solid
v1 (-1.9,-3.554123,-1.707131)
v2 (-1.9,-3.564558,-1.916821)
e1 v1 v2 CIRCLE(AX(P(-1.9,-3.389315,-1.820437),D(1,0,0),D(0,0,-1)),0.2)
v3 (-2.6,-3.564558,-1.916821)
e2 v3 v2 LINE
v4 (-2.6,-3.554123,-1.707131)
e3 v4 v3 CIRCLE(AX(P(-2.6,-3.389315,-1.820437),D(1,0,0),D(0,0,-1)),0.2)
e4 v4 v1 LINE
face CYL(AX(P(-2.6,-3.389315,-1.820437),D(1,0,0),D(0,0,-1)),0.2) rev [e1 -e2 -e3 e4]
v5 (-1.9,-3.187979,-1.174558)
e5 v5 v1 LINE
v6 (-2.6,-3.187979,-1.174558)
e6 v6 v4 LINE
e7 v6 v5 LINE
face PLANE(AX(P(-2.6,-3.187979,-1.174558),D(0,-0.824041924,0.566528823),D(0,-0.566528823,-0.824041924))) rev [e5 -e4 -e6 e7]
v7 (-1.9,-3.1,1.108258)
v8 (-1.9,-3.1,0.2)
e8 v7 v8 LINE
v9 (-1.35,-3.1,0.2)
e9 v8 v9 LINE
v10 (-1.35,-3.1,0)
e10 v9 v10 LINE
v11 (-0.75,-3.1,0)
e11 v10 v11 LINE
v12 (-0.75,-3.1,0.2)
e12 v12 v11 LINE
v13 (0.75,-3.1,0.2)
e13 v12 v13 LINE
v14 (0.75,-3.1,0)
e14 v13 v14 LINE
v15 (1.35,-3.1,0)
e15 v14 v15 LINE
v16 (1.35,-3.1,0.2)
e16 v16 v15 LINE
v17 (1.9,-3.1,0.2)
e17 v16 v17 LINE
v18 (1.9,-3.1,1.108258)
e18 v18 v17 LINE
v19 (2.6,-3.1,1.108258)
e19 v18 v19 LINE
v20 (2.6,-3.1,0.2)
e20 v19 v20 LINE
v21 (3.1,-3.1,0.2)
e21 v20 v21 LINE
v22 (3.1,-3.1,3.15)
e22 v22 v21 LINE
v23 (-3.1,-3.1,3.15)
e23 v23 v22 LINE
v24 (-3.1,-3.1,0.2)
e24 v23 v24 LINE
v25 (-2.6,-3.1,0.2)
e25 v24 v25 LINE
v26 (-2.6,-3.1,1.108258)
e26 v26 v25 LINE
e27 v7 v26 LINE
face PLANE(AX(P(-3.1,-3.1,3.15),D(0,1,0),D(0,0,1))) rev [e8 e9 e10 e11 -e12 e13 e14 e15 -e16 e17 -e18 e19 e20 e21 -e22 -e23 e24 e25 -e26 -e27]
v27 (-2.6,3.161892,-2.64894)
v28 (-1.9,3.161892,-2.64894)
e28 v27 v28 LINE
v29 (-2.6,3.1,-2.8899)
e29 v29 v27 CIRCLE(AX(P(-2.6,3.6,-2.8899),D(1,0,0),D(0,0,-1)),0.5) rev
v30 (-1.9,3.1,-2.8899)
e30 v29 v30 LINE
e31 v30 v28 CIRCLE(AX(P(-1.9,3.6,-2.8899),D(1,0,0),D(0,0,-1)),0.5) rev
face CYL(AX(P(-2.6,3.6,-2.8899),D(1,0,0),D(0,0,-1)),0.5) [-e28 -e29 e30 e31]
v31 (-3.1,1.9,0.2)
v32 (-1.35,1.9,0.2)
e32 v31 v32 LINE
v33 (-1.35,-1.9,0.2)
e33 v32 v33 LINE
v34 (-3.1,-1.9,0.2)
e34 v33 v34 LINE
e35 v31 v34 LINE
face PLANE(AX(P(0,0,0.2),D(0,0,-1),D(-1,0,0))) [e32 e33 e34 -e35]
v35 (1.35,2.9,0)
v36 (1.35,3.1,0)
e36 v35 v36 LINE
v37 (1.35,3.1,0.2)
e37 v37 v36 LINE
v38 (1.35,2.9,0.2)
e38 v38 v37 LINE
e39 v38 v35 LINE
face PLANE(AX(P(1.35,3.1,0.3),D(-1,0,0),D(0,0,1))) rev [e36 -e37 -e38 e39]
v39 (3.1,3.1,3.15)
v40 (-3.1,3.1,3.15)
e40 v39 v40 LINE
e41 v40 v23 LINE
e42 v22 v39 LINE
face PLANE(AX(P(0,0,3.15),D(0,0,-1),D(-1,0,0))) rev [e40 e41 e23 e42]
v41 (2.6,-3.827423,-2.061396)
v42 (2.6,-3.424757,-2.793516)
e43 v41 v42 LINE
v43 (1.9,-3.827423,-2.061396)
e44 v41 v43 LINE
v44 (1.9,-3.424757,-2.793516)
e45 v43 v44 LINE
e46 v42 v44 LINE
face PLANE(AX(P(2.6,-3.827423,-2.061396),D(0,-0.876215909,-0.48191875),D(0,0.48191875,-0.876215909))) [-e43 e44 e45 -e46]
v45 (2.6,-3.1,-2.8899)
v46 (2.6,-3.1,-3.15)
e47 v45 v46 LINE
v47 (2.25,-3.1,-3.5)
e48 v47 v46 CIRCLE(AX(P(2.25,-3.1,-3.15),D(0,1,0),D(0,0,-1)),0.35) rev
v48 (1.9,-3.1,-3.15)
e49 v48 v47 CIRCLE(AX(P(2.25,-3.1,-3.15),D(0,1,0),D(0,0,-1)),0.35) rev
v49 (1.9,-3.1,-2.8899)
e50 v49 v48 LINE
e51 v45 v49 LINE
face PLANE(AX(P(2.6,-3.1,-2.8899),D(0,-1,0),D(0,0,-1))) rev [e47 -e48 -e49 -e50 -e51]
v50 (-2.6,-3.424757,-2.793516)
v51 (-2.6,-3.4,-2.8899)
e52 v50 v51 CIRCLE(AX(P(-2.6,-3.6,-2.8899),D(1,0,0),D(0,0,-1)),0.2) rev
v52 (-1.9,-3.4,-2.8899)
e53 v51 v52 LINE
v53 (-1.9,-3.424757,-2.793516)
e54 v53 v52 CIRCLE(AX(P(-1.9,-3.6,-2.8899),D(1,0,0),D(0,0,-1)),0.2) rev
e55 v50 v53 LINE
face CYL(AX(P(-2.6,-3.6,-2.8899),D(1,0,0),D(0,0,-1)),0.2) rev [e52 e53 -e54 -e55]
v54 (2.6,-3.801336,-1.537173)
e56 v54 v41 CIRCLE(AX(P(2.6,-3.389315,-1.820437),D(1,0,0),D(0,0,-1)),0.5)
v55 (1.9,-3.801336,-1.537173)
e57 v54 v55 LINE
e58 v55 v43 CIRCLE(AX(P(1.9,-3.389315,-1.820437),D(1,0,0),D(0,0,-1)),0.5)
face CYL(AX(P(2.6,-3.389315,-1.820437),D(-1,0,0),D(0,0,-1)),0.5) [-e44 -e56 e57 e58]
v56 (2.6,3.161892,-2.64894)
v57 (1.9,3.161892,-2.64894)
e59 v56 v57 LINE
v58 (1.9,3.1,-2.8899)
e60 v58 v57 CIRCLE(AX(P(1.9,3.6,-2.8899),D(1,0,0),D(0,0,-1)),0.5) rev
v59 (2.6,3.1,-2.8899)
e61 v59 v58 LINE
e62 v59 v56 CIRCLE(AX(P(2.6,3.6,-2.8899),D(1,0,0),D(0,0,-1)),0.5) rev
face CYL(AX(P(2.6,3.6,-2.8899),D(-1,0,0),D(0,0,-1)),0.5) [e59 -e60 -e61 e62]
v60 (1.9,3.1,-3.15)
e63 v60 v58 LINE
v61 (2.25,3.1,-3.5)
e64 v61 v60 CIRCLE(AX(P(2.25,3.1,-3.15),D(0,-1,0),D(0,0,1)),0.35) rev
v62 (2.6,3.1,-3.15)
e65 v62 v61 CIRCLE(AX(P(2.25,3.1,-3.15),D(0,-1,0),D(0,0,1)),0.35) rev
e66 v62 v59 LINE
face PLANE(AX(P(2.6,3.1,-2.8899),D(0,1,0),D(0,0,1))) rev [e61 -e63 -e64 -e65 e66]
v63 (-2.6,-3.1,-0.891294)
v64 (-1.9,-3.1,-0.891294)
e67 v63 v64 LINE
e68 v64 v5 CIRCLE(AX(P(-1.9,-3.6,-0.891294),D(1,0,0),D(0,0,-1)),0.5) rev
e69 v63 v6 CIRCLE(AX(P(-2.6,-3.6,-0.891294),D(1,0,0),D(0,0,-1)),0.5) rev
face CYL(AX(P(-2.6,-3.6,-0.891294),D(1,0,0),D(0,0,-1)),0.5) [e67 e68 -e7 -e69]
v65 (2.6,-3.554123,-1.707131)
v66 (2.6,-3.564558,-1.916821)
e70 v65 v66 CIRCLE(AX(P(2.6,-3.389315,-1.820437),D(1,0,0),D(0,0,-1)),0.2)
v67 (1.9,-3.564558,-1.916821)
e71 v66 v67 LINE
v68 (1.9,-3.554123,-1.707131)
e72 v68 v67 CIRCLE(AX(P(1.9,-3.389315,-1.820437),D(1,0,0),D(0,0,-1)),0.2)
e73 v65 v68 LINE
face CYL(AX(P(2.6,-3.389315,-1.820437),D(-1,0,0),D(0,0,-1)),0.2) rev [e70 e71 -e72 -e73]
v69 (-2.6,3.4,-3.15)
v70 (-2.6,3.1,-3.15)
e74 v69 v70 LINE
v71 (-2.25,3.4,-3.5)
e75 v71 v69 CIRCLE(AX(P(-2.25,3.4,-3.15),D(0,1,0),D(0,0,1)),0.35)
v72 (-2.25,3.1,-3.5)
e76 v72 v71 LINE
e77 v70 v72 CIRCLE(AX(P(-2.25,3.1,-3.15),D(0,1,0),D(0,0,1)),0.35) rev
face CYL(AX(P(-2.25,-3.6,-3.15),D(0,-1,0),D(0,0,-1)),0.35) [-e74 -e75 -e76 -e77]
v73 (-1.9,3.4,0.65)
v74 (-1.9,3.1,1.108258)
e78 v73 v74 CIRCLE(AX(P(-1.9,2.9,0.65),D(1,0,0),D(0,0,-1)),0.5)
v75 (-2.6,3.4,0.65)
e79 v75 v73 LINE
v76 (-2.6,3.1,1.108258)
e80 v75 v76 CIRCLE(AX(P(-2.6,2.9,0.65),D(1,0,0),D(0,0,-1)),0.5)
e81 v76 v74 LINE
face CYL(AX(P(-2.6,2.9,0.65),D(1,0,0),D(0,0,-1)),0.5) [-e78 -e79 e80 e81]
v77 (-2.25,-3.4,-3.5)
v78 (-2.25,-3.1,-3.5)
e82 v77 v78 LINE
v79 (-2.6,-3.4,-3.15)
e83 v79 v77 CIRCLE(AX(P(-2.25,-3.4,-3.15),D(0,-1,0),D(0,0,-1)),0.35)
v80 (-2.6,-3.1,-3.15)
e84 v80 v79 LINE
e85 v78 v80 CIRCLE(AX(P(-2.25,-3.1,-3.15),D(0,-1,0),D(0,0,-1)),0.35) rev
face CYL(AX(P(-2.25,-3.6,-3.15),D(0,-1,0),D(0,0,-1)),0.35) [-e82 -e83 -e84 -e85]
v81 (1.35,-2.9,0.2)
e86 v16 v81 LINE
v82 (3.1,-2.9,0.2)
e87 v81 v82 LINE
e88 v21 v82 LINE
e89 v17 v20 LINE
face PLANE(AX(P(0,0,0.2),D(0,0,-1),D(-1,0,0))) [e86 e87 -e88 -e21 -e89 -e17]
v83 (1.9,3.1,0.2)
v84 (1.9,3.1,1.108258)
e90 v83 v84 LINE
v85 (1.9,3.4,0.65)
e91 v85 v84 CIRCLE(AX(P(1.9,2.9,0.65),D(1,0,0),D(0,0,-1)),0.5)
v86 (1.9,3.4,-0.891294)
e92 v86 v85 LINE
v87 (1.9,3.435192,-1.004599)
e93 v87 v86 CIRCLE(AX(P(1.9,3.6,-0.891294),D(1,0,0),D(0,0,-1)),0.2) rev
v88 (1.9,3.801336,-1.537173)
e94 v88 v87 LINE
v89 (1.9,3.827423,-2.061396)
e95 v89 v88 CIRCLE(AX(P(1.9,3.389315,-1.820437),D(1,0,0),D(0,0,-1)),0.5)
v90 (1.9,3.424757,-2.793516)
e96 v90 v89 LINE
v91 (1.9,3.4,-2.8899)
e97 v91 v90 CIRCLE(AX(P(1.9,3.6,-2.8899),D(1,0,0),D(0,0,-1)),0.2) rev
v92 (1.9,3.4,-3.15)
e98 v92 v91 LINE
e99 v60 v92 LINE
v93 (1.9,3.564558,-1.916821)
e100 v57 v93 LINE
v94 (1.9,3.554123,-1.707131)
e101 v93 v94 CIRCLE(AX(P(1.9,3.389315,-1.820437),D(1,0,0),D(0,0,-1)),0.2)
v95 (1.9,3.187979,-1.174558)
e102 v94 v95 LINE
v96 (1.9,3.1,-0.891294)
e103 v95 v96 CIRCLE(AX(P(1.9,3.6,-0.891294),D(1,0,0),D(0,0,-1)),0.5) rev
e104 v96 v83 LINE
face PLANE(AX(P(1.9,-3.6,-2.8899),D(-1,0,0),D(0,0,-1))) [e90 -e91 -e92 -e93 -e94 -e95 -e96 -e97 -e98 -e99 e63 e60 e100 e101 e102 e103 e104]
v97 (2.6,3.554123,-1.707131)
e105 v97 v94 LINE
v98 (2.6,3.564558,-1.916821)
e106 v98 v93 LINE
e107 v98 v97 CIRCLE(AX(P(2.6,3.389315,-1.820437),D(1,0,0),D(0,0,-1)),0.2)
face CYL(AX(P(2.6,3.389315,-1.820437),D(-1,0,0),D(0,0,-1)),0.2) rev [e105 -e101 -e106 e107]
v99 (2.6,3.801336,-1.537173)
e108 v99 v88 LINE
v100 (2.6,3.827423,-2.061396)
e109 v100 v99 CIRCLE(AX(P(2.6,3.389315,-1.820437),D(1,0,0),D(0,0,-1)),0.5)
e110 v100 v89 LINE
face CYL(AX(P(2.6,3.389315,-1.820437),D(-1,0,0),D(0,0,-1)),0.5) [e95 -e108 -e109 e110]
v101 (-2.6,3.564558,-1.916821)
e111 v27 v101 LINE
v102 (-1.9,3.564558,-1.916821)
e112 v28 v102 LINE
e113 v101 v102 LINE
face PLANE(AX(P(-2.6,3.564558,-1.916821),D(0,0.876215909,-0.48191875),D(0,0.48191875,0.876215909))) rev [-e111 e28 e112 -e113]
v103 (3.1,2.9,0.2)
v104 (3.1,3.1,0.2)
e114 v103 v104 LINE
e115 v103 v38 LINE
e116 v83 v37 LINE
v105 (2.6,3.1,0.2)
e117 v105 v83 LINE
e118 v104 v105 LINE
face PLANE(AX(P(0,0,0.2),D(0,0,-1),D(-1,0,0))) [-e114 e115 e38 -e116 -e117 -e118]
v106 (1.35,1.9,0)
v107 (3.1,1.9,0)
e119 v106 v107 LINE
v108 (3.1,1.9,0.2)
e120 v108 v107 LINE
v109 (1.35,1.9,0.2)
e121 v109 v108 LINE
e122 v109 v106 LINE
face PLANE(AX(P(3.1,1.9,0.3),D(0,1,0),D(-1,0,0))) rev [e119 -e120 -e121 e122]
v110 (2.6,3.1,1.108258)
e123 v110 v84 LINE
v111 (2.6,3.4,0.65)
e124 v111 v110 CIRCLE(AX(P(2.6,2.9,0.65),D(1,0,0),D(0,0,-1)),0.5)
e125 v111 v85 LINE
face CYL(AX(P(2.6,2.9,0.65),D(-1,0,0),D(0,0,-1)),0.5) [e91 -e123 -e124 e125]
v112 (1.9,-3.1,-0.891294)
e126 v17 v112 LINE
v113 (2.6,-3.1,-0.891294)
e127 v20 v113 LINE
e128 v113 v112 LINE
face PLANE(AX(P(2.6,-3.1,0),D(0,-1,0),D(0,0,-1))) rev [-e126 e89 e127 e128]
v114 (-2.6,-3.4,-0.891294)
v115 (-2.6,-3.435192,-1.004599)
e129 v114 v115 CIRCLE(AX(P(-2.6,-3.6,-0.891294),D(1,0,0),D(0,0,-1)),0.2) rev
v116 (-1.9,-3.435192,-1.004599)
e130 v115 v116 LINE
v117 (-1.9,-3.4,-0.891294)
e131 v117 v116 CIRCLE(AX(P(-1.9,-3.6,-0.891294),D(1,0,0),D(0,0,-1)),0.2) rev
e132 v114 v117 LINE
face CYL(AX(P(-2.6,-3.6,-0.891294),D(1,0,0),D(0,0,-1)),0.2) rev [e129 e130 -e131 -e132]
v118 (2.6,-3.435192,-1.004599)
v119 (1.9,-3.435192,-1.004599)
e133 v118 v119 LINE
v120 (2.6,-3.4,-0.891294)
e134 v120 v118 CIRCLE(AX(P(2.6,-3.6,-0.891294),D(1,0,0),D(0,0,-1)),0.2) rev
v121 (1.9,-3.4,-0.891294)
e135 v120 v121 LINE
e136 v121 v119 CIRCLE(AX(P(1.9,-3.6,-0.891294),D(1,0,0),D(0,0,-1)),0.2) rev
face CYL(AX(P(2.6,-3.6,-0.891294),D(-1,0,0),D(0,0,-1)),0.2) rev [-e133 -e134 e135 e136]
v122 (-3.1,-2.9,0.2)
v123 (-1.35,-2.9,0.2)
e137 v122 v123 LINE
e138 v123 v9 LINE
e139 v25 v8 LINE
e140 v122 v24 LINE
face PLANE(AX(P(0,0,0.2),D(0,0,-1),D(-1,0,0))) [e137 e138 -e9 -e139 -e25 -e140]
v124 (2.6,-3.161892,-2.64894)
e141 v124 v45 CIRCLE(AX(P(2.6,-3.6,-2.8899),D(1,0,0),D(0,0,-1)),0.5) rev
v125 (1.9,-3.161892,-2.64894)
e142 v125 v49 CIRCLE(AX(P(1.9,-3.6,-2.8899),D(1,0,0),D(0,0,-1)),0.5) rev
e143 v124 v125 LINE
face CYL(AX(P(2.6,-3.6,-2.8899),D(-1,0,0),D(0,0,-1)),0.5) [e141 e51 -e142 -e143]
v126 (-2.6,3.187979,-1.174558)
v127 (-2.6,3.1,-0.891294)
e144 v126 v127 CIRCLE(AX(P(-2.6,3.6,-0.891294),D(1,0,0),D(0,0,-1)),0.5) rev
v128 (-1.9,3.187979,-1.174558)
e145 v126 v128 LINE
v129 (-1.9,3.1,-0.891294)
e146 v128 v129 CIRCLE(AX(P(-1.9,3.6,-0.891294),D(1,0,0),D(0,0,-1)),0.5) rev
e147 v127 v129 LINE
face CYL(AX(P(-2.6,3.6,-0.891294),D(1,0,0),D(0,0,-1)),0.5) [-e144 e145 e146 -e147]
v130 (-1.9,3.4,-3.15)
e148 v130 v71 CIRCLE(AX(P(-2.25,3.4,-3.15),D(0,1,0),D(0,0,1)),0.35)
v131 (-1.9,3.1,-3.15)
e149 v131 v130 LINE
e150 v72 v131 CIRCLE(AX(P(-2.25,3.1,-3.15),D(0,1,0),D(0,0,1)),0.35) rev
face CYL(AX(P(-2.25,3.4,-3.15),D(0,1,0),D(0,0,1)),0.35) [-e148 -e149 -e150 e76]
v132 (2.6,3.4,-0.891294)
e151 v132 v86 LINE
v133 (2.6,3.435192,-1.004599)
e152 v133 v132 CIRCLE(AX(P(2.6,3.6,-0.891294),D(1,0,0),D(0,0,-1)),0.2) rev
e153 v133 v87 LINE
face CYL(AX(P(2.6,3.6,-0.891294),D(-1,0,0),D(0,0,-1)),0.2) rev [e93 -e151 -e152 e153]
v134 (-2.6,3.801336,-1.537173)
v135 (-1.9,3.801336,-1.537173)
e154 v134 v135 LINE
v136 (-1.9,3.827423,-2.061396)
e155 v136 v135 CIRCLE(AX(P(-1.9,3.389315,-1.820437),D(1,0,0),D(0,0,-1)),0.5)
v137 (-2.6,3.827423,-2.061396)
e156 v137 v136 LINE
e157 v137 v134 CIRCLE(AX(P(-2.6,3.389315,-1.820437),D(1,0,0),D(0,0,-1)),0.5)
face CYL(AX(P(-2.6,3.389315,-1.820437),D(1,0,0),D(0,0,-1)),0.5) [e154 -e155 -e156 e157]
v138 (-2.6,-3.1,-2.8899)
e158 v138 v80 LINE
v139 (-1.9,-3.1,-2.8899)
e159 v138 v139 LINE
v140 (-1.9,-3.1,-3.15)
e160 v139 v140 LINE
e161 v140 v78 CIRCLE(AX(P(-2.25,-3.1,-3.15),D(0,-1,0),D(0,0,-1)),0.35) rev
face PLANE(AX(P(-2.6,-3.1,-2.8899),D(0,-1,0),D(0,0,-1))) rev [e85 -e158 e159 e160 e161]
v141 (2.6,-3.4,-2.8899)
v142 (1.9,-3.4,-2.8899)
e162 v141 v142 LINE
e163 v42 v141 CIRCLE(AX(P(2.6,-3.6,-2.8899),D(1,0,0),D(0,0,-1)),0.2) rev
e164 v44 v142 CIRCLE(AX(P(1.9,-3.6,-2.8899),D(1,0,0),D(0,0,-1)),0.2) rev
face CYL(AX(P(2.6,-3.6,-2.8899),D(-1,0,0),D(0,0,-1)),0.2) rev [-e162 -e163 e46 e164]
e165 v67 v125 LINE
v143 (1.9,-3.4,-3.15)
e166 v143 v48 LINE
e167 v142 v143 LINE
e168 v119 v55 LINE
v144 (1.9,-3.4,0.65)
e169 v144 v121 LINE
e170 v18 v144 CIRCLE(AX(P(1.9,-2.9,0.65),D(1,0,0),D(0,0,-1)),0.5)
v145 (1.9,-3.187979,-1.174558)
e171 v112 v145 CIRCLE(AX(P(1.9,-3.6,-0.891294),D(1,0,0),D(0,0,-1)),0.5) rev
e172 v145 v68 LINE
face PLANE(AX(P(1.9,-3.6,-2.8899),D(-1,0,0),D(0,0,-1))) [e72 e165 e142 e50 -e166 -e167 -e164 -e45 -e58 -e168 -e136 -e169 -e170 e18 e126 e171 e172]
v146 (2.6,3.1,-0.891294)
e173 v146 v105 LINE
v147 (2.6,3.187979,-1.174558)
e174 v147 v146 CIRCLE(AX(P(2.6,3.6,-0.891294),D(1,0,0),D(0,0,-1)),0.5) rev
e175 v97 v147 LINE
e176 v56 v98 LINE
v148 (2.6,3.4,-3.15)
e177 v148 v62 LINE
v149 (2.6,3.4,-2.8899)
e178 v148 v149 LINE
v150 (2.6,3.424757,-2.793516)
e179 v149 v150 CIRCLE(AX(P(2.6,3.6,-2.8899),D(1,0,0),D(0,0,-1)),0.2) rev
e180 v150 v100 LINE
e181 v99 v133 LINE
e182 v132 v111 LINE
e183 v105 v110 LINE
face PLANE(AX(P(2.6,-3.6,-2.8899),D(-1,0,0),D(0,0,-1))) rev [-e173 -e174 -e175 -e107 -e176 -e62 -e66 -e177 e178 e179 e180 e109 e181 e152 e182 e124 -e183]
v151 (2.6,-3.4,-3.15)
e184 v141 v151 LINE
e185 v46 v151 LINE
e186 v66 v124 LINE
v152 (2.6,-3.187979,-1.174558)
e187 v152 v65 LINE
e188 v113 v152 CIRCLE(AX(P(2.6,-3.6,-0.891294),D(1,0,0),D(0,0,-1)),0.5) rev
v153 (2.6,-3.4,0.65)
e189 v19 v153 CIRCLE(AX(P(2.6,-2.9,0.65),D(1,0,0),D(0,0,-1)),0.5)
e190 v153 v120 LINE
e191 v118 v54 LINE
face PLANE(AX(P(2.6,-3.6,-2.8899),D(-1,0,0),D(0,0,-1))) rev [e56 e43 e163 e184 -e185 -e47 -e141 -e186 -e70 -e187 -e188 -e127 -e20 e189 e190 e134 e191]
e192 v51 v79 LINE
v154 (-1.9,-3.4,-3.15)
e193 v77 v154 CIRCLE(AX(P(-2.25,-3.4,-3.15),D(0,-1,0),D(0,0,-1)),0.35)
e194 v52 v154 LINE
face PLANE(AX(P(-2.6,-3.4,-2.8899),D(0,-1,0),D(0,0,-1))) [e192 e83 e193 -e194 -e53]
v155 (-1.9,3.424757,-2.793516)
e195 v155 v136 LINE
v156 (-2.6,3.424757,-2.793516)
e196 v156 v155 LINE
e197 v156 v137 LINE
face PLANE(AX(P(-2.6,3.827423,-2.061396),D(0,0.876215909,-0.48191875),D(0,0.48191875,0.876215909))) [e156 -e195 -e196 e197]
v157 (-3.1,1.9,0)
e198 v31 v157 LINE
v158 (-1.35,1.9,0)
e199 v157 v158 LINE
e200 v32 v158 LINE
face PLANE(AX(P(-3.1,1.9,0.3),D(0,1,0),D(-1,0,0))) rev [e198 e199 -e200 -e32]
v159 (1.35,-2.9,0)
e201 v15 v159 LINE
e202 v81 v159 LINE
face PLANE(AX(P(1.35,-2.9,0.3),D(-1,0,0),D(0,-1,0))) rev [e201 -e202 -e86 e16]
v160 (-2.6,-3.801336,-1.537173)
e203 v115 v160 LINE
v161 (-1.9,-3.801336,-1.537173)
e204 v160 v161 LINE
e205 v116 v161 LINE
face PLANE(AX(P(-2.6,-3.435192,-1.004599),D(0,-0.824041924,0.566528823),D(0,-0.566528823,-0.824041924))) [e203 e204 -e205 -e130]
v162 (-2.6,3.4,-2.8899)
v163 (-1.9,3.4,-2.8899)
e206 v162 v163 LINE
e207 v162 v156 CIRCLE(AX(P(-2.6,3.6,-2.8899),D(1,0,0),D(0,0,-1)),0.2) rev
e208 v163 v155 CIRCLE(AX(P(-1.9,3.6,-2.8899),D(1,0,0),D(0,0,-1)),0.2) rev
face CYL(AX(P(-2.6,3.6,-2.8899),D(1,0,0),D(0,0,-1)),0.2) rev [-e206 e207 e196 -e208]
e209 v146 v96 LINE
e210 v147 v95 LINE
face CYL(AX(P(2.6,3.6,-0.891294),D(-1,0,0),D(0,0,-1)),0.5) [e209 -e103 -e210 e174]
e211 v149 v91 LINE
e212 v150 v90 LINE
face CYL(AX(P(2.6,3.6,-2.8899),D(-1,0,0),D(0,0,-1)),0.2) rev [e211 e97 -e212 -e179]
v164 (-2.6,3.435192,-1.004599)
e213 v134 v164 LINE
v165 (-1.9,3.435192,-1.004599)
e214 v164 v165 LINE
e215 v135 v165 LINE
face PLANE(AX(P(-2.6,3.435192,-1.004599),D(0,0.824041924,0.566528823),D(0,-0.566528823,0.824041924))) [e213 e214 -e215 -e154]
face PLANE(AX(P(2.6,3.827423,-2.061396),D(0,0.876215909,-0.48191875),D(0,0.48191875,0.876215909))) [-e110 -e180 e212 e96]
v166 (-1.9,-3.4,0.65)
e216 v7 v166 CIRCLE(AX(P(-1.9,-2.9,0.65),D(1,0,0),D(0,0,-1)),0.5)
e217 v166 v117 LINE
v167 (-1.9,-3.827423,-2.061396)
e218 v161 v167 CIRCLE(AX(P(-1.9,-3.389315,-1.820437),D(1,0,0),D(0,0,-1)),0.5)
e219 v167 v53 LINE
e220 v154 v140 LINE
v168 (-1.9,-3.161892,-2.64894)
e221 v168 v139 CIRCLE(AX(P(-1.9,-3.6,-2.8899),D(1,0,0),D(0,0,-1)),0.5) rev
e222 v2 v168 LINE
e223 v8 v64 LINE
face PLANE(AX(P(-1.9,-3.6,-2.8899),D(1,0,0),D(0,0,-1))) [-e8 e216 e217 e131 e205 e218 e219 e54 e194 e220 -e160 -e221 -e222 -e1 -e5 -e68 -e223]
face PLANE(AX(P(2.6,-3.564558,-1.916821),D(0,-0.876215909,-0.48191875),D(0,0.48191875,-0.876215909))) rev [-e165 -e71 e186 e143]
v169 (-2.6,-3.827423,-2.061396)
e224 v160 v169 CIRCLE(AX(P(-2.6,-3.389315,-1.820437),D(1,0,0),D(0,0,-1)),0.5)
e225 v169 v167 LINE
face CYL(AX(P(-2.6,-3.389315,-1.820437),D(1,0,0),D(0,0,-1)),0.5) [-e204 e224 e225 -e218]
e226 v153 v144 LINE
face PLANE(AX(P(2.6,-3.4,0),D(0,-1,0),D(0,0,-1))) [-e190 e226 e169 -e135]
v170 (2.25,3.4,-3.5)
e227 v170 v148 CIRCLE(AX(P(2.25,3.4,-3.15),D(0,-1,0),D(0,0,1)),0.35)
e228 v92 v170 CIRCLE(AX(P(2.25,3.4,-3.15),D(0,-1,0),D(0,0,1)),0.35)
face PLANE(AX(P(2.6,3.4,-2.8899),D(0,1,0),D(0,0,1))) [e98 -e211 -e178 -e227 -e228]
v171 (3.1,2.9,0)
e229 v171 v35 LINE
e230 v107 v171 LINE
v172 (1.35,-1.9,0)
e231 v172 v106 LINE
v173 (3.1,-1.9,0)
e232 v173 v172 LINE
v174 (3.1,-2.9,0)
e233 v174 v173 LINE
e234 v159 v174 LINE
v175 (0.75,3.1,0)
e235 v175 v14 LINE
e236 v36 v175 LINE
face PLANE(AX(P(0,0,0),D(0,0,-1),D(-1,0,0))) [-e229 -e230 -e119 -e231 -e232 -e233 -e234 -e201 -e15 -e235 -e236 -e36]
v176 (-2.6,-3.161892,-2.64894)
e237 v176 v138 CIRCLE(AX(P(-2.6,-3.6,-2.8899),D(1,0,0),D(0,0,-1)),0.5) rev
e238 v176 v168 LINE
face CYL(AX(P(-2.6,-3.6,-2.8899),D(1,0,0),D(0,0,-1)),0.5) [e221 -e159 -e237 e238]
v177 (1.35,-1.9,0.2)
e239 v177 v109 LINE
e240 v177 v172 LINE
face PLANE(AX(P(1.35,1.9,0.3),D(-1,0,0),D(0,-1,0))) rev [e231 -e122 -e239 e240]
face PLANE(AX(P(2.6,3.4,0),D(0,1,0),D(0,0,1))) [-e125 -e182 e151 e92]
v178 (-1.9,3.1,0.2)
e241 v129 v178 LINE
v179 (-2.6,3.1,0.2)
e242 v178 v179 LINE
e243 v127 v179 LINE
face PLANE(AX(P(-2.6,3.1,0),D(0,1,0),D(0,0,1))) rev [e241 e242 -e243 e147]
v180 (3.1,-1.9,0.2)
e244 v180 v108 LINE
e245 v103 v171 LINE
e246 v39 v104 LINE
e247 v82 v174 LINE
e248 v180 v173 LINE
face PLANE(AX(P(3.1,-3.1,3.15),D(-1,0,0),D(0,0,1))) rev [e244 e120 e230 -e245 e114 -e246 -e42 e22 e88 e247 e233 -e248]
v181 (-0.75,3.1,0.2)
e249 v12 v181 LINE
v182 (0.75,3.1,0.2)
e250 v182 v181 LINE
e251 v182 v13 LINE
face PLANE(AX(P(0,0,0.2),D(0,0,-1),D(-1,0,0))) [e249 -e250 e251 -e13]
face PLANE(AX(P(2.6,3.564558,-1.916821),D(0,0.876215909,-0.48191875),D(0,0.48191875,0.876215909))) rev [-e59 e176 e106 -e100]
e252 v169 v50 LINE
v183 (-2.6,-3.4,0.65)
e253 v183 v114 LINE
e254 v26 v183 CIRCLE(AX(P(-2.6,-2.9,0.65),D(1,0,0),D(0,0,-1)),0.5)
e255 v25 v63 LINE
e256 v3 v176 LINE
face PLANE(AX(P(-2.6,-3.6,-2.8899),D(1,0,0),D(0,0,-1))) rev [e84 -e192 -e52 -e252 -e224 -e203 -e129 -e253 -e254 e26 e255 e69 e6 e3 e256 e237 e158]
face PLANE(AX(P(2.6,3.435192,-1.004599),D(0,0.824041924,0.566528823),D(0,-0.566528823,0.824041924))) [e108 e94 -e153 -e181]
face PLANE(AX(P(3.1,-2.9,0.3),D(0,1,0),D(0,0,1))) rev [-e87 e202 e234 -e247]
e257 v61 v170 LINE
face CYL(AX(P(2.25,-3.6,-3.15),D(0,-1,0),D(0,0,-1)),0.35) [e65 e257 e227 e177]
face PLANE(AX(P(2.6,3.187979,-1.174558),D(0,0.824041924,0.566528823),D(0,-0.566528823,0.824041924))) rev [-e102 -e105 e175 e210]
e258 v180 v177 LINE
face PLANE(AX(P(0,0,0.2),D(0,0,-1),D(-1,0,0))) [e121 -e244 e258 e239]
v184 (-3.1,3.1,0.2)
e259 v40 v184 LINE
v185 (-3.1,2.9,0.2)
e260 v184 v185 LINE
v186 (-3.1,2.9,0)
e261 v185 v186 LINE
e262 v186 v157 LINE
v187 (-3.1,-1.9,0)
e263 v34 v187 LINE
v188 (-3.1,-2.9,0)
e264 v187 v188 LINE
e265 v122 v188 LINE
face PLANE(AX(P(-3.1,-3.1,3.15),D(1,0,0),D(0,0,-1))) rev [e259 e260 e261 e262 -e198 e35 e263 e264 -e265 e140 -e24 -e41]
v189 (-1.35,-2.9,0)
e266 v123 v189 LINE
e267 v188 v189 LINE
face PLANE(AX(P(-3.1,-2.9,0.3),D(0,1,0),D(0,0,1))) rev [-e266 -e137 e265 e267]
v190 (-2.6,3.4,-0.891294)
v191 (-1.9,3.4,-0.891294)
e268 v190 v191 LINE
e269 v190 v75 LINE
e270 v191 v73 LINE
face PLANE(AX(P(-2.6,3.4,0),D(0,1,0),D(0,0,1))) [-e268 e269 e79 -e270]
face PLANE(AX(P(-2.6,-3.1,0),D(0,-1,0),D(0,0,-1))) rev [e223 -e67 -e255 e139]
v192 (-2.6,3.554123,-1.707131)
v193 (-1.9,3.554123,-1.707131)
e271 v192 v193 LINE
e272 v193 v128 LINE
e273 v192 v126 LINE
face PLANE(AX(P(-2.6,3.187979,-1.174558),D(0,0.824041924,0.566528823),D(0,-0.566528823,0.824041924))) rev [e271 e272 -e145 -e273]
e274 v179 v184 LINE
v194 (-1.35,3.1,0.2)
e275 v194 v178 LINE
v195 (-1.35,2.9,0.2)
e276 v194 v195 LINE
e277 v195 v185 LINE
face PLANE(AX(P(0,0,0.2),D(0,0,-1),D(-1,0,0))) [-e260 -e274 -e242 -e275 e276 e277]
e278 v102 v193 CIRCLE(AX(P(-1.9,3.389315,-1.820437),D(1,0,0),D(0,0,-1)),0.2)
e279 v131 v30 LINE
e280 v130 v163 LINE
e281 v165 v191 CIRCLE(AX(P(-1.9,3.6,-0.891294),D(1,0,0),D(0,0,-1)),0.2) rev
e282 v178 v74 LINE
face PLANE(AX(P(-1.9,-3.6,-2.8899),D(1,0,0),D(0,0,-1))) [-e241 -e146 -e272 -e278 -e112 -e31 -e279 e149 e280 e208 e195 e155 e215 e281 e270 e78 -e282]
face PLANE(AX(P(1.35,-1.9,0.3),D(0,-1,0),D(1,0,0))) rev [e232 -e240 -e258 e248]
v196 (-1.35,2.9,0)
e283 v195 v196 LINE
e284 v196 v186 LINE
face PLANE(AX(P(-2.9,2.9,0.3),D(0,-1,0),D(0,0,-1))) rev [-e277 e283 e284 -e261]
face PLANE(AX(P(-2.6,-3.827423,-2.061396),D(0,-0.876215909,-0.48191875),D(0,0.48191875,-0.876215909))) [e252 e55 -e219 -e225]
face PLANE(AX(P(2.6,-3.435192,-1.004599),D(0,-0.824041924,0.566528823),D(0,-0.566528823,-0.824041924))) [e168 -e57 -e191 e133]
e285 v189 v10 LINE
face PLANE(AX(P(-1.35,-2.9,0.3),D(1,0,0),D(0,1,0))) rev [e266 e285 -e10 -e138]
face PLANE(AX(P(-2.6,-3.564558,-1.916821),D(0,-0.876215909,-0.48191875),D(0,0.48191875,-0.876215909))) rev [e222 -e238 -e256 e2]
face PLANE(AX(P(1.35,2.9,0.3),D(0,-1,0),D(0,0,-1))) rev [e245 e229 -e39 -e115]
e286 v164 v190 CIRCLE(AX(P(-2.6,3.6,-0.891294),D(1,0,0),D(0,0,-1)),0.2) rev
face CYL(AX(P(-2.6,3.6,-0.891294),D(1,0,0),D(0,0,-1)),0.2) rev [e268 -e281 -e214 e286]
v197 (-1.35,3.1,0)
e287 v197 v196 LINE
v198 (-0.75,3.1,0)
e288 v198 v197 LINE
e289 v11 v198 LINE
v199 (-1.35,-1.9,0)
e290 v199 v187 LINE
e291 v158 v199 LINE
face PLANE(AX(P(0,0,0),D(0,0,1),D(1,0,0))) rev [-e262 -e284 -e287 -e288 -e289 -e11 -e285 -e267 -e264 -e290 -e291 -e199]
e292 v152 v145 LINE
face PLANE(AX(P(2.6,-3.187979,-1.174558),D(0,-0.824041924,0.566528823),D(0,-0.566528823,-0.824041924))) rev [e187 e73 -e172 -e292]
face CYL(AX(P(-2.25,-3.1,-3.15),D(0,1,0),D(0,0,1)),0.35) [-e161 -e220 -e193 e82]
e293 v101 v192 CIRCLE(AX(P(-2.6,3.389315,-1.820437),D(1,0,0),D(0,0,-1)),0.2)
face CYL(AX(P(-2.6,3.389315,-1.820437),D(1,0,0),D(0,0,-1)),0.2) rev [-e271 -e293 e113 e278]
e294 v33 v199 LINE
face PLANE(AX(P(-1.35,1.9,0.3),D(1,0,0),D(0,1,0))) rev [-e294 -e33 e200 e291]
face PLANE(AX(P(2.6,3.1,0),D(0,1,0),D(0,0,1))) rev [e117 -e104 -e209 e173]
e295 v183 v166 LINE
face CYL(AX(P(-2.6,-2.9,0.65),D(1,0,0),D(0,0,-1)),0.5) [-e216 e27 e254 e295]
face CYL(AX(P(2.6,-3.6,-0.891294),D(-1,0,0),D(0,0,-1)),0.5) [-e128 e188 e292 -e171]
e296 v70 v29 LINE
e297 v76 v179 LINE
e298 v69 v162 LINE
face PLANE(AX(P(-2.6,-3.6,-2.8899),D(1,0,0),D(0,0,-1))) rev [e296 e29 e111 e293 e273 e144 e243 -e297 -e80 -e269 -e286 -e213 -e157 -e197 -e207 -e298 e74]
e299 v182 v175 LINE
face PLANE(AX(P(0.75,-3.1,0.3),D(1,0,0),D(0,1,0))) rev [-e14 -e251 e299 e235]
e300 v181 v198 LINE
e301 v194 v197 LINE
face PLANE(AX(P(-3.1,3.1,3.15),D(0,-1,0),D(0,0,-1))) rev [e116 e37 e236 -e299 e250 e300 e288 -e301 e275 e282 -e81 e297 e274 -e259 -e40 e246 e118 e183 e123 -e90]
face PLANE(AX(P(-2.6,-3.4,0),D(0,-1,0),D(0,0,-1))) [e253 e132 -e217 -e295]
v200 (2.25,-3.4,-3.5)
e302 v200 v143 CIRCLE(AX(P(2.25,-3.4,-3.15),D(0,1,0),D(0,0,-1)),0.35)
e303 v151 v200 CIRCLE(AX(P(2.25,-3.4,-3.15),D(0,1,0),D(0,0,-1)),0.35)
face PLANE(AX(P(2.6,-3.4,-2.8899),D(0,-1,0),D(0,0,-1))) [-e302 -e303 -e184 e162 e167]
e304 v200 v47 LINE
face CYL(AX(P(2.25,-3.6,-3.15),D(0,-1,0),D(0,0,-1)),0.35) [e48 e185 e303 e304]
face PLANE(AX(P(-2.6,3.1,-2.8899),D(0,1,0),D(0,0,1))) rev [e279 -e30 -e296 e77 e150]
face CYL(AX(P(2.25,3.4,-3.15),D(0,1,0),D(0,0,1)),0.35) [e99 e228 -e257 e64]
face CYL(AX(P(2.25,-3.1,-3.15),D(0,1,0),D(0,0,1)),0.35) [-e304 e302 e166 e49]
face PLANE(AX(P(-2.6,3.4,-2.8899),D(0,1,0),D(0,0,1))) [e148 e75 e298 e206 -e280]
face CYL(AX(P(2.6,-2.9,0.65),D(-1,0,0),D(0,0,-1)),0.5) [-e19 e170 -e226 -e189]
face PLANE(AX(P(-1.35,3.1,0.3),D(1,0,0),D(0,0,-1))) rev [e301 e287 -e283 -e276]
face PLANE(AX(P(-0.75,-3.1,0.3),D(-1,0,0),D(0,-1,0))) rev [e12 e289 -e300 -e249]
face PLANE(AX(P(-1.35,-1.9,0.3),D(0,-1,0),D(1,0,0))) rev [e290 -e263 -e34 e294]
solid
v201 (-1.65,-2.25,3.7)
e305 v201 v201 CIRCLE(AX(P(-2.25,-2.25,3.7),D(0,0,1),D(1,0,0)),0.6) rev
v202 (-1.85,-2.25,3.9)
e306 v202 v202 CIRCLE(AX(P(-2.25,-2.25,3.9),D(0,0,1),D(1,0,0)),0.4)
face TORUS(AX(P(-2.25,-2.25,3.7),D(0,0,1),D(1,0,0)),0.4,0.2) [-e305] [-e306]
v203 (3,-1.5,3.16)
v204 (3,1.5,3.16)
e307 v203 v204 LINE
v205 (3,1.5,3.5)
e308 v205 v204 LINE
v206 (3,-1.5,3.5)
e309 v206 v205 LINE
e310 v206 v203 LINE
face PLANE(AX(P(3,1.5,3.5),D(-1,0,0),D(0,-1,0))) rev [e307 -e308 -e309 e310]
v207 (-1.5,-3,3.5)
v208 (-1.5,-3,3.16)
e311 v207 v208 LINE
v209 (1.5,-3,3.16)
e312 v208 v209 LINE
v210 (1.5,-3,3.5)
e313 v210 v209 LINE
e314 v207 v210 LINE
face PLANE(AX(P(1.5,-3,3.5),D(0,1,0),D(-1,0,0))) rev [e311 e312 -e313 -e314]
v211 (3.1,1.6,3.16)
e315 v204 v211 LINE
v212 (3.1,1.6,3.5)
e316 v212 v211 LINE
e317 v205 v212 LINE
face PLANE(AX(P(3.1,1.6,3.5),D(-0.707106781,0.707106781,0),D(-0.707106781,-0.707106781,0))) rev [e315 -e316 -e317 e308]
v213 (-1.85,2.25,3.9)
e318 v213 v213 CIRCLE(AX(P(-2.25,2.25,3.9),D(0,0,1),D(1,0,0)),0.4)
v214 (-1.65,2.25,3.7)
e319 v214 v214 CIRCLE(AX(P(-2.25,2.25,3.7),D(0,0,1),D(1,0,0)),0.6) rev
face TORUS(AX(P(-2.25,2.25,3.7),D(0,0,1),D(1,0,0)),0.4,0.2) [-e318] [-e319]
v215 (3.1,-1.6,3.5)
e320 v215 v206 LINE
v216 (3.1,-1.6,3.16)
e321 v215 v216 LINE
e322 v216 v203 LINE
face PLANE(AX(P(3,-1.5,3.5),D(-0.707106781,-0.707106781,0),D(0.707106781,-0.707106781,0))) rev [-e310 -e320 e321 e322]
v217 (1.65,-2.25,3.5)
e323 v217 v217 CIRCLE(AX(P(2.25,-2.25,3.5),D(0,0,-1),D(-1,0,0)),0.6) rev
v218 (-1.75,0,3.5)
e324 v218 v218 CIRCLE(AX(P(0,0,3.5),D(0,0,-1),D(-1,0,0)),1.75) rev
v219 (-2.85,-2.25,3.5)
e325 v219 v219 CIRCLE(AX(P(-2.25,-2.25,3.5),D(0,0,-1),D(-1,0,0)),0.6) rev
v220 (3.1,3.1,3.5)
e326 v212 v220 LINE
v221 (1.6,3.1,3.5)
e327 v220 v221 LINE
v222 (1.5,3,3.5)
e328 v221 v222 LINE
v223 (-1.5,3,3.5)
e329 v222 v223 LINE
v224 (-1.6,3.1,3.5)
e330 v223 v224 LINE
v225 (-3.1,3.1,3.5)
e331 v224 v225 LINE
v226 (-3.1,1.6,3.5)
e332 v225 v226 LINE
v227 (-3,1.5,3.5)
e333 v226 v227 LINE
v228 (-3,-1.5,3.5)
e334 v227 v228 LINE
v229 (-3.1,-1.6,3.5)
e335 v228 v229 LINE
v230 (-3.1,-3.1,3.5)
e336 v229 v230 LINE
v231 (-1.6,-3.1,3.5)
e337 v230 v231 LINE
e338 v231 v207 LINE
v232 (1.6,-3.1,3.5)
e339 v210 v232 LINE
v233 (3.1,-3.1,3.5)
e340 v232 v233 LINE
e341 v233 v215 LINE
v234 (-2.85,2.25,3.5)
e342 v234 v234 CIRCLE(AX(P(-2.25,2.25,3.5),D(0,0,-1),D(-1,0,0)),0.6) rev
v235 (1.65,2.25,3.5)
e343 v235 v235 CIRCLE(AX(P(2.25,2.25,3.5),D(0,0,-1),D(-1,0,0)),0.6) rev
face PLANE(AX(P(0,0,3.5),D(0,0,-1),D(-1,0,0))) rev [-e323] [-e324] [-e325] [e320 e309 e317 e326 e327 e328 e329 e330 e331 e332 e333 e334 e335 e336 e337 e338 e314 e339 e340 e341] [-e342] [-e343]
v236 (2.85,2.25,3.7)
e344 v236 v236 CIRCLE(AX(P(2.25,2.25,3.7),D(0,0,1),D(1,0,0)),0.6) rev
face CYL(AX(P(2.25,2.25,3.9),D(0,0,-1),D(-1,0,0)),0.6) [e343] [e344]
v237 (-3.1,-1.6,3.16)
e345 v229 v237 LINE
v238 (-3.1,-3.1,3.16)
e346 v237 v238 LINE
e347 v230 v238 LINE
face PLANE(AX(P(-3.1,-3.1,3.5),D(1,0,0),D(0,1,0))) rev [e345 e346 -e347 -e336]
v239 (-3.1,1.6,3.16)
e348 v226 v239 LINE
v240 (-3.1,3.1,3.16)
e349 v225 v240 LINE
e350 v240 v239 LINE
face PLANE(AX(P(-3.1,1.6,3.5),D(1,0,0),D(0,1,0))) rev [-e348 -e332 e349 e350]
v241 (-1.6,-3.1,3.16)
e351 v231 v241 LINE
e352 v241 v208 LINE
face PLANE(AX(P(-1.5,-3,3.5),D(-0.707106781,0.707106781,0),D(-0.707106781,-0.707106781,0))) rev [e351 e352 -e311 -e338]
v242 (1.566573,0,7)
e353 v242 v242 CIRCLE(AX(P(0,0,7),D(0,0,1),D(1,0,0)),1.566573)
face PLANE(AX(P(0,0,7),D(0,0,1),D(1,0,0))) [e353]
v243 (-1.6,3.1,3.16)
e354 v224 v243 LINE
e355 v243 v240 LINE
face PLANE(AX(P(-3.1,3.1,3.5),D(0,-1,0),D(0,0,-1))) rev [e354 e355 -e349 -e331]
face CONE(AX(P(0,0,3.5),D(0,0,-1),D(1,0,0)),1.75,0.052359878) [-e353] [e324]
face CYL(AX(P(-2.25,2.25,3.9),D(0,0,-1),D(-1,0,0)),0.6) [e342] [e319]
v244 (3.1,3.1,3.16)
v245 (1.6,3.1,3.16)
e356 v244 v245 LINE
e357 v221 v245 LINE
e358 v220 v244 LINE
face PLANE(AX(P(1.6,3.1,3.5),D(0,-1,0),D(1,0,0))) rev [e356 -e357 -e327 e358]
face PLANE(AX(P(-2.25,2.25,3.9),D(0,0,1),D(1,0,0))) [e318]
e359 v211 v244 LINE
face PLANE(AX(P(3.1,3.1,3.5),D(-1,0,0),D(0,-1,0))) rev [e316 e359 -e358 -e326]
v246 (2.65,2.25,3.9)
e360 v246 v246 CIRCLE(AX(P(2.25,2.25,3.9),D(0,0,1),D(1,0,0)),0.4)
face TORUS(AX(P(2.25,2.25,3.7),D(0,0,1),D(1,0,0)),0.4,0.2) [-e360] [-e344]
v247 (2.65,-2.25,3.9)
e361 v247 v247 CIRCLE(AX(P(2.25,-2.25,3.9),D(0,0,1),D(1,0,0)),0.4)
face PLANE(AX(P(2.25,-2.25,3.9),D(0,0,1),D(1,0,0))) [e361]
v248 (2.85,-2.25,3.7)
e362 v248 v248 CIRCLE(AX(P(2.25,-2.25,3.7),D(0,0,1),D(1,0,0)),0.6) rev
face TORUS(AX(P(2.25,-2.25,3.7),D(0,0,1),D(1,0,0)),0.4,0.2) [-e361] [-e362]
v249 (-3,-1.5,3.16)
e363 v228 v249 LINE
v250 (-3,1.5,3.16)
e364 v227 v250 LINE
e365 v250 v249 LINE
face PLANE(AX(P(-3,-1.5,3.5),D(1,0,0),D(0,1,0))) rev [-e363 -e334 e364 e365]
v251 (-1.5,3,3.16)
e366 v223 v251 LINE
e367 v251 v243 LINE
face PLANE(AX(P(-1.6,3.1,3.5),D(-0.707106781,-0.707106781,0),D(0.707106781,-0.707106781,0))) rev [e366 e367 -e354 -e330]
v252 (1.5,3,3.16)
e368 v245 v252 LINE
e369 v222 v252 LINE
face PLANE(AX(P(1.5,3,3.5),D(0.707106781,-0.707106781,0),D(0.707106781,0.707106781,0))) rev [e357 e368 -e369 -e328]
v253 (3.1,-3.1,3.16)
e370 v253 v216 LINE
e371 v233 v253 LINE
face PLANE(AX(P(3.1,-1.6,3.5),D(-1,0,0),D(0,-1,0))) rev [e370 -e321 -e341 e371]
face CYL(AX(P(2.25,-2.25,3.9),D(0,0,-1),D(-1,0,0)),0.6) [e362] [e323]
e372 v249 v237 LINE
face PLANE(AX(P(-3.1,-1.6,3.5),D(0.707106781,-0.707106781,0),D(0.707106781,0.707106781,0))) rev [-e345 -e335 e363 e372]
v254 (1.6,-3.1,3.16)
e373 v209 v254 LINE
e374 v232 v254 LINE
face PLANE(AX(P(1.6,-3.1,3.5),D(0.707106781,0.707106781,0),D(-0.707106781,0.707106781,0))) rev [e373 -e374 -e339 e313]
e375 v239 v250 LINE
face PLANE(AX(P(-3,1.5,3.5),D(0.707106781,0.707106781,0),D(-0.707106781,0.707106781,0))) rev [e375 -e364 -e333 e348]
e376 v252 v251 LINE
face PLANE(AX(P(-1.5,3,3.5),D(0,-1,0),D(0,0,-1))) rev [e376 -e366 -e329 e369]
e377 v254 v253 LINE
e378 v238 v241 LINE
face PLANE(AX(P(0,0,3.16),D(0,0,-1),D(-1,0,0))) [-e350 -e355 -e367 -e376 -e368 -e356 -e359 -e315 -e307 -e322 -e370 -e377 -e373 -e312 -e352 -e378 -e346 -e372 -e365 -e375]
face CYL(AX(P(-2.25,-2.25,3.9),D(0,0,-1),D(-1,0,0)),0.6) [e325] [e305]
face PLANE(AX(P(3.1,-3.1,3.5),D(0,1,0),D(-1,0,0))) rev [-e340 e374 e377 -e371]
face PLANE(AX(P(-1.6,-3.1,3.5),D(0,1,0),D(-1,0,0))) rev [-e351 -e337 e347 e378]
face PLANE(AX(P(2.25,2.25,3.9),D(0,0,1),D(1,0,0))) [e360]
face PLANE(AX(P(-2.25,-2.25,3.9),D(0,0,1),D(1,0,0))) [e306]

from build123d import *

# Parameters (mm, degrees)
EXTRUDE_1_2_DEPTH      = 0.35
EXTRUDE_1_2_DEPTH_BACK = 0.35
FILLET_2_R             = 0.35
EXTRUDE_START          = 0.2
SKETCH_4_W             = 6.2
SKETCH_4_H             = 6.2
EXTRUDE_1051_DEPTH     = 2.95
EXTRUDE_1452_DEPTH     = 0.3
EXTRUDE_START_2        = 0.01
EXTRUDE_1880_DEPTH     = 0.34
SKETCH_6_R             = 0.6
EXTRUDE_2308_DEPTH     = 0.4
FILLET_3_R             = 0.2
SKETCH_7_R             = 1.75
EXTRUDE_2879_DEPTH     = 3.5
EXTRUDE_2879_TAPER     = 3


with BuildPart() as part:
    # Sketch 290 → Выводы 1-2 (new, two sides: drawn at the far end of the back side and taken through both)
    with BuildSketch(Plane(origin=(-2.25, 0, 0), x_dir=(0, 0, -1), z_dir=(1, 0, 0)).offset(-EXTRUDE_1_2_DEPTH_BACK)):
        with BuildLine():
            Line((3.5, 3.4), (2.889899868, 3.4))
            ThreePointArc((2.889899868, 3.4), (2.840143644, 3.406288054), (2.793516118, 3.424756818))
            Line((2.793516118, 3.424756818), (2.06139634, 3.827422696))
            ThreePointArc((2.06139634, 3.827422696), (1.795586174, 3.888696798), (1.537172553, 3.801335704))
            Line((1.537172553, 3.801335704), (1.004599333, 3.435191615))
            ThreePointArc((1.004599333, 3.435191615), (0.95061609, 3.409000423), (0.891293569, 3.4))
            Line((0.891293569, 3.4), (0, 3.4))
            Line((0, 3.4), (-0.65, 3.4))
            ThreePointArc((-0.65, 3.4), (-1.003553391, 3.253553391), (-1.15, 2.9))
            Line((-1.15, 2.9), (-1.15, -2.9))
            ThreePointArc((-1.15, -2.9), (-1.003553391, -3.253553391), (-0.65, -3.4))
            Line((-0.65, -3.4), (0, -3.4))
            Line((0, -3.4), (0.891293569, -3.4))
            ThreePointArc((0.891293569, -3.4), (0.95061609, -3.409000423), (1.004599333, -3.435191615))
            Line((1.004599333, -3.435191615), (1.537172553, -3.801335704))
            ThreePointArc((1.537172553, -3.801335704), (1.795586174, -3.888696798), (2.06139634, -3.827422696))
            Line((2.06139634, -3.827422696), (2.793516118, -3.424756818))
            ThreePointArc((2.793516118, -3.424756818), (2.840143644, -3.406288054), (2.889899868, -3.4))
            Line((2.889899868, -3.4), (3.5, -3.4))
            Line((3.5, -3.4), (3.5, -3.1))
            Line((3.5, -3.1), (2.889899868, -3.1))
            ThreePointArc((2.889899868, -3.1), (2.765509308, -3.115720134), (2.648940493, -3.161892046))
            Line((2.648940493, -3.161892046), (1.916820715, -3.564557924))
            ThreePointArc((1.916820715, -3.564557924), (1.810496648, -3.589067564), (1.7071312, -3.554123127))
            Line((1.7071312, -3.554123127), (1.17455798, -3.187979038))
            ThreePointArc((1.17455798, -3.187979038), (1.039599872, -3.122501057), (0.891293569, -3.1))
            Line((0.891293569, -3.1), (0, -3.1))
            Line((0, -3.1), (-0.65, -3.1))
            ThreePointArc((-0.65, -3.1), (-0.791421356, -3.041421356), (-0.85, -2.9))
            Line((-0.85, -2.9), (-0.85, 2.9))
            ThreePointArc((-0.85, 2.9), (-0.791421356, 3.041421356), (-0.65, 3.1))
            Line((-0.65, 3.1), (0, 3.1))
            Line((0, 3.1), (0.891293569, 3.1))
            ThreePointArc((0.891293569, 3.1), (1.039599872, 3.122501057), (1.17455798, 3.187979038))
            Line((1.17455798, 3.187979038), (1.7071312, 3.554123127))
            ThreePointArc((1.7071312, 3.554123127), (1.810496648, 3.589067564), (1.916820715, 3.564557924))
            Line((1.916820715, 3.564557924), (2.648940493, 3.161892046))
            ThreePointArc((2.648940493, 3.161892046), (2.765509308, 3.115720134), (2.889899868, 3.1))
            Line((2.889899868, 3.1), (3.5, 3.1))
            Line((3.5, 3.1), (3.5, 3.4))
        make_face()
    extrude(amount=EXTRUDE_1_2_DEPTH + EXTRUDE_1_2_DEPTH_BACK)

    # Скругление2
    fillet_2_edges = [part.edges().sort_by_distance(p)[0] for p in [
        (-1.9, -3.25, -3.5),
        (-2.6, -3.25, -3.5),
        (-1.9, 3.25, -3.5),
        (-2.6, 3.25, -3.5),
    ]]
    fillet(fillet_2_edges, radius=FILLET_2_R - 0.0001)  # a hair under: the kernel refuses the full size


with BuildPart() as body_2:
    # Зеркальное отражение4: mirrored copy
    add(part.part.mirror(Plane(origin=(0, 0, 0), x_dir=(0, 0, 1), z_dir=(1, 0, 0))))


with BuildPart() as part_1:
    add(part.part)

    add(body_2.part)  # Extrude 1051 merges body 2
    # Эскиз4 → Extrude 1051 (add)
    with BuildSketch(Plane.XY.offset(EXTRUDE_START)):
        Rectangle(SKETCH_4_W, SKETCH_4_H)
    extrude(amount=EXTRUDE_1051_DEPTH)

    # Эскиз9 → Extrude 1452 (add)
    with BuildSketch(Plane.XY):
        Polygon((-0.75, -3.1), (-0.75, 3.1), (-1.35, 3.1), (-1.35, 2.9), (-2.9, 2.9), (-3.1, 2.9), (-3.1, 1.9), (-1.35, 1.9), (-1.35, -1.9), (-3.1, -1.9), (-3.1, -2.9), (-1.35, -2.9), (-1.35, -3.1), align=None)
        Polygon((1.35, -3.1), (0.75, -3.1), (0.75, 3.1), (1.35, 3.1), (1.35, 2.9), (2.9, 2.9), (3.1, 2.9), (3.1, 1.9), (1.35, 1.9), (1.35, -1.9), (3.1, -1.9), (3.1, -2.9), (1.35, -2.9), align=None)
    extrude(amount=EXTRUDE_1452_DEPTH)


with BuildPart() as body_2_2:
    # Эскиз5 → Extrude 1880 (new body)
    with BuildSketch(Plane.XY.offset(3.15).offset(EXTRUDE_START_2)):
        Polygon((0, 3), (1.5, 3), (1.6, 3.1), (3.1, 3.1), (3.1, 1.6), (3, 1.5), (3, 0), (3, -1.5), (3.1, -1.6), (3.1, -3.1), (1.6, -3.1), (1.5, -3), (0, -3), (-1.5, -3), (-1.6, -3.1), (-3.1, -3.1), (-3.1, -1.6), (-3, -1.5), (-3, 0), (-3, 1.5), (-3.1, 1.6), (-3.1, 3.1), (-1.6, 3.1), (-1.5, 3), align=None)
    extrude(amount=EXTRUDE_1880_DEPTH)

    # Эскиз6 → Extrude 2308 (add)
    with BuildSketch(Plane.XY.offset(3.5)):
        with Locations(Location((-2.25, -2.25, 0), (0, 0, 180))):
            Circle(SKETCH_6_R)
        with Locations(Location((-2.25, 2.25, 0), (0, 0, 180))):
            Circle(SKETCH_6_R)
        with Locations(Location((2.25, 2.25, 0), (0, 0, 180))):
            Circle(SKETCH_6_R)
        with Locations(Location((2.25, -2.25, 0), (0, 0, 180))):
            Circle(SKETCH_6_R)
    extrude(amount=EXTRUDE_2308_DEPTH)

    # Скругление3
    fillet_3_edges = [body_2_2.edges().sort_by_distance(p)[0] for p in [
        (-1.65, -2.25, 3.9),
        (-1.65, 2.25, 3.9),
        (2.85, 2.25, 3.9),
        (2.85, -2.25, 3.9),
    ]]
    fillet(fillet_3_edges, radius=FILLET_3_R)

    # Эскиз7 → Extrude 2879 (add)
    with BuildSketch(Plane.XY.offset(3.5)):
        Circle(SKETCH_7_R)
    extrude(amount=EXTRUDE_2879_DEPTH, taper=EXTRUDE_2879_TAPER)


solid = Compound([part_1.part, body_2_2.part])
